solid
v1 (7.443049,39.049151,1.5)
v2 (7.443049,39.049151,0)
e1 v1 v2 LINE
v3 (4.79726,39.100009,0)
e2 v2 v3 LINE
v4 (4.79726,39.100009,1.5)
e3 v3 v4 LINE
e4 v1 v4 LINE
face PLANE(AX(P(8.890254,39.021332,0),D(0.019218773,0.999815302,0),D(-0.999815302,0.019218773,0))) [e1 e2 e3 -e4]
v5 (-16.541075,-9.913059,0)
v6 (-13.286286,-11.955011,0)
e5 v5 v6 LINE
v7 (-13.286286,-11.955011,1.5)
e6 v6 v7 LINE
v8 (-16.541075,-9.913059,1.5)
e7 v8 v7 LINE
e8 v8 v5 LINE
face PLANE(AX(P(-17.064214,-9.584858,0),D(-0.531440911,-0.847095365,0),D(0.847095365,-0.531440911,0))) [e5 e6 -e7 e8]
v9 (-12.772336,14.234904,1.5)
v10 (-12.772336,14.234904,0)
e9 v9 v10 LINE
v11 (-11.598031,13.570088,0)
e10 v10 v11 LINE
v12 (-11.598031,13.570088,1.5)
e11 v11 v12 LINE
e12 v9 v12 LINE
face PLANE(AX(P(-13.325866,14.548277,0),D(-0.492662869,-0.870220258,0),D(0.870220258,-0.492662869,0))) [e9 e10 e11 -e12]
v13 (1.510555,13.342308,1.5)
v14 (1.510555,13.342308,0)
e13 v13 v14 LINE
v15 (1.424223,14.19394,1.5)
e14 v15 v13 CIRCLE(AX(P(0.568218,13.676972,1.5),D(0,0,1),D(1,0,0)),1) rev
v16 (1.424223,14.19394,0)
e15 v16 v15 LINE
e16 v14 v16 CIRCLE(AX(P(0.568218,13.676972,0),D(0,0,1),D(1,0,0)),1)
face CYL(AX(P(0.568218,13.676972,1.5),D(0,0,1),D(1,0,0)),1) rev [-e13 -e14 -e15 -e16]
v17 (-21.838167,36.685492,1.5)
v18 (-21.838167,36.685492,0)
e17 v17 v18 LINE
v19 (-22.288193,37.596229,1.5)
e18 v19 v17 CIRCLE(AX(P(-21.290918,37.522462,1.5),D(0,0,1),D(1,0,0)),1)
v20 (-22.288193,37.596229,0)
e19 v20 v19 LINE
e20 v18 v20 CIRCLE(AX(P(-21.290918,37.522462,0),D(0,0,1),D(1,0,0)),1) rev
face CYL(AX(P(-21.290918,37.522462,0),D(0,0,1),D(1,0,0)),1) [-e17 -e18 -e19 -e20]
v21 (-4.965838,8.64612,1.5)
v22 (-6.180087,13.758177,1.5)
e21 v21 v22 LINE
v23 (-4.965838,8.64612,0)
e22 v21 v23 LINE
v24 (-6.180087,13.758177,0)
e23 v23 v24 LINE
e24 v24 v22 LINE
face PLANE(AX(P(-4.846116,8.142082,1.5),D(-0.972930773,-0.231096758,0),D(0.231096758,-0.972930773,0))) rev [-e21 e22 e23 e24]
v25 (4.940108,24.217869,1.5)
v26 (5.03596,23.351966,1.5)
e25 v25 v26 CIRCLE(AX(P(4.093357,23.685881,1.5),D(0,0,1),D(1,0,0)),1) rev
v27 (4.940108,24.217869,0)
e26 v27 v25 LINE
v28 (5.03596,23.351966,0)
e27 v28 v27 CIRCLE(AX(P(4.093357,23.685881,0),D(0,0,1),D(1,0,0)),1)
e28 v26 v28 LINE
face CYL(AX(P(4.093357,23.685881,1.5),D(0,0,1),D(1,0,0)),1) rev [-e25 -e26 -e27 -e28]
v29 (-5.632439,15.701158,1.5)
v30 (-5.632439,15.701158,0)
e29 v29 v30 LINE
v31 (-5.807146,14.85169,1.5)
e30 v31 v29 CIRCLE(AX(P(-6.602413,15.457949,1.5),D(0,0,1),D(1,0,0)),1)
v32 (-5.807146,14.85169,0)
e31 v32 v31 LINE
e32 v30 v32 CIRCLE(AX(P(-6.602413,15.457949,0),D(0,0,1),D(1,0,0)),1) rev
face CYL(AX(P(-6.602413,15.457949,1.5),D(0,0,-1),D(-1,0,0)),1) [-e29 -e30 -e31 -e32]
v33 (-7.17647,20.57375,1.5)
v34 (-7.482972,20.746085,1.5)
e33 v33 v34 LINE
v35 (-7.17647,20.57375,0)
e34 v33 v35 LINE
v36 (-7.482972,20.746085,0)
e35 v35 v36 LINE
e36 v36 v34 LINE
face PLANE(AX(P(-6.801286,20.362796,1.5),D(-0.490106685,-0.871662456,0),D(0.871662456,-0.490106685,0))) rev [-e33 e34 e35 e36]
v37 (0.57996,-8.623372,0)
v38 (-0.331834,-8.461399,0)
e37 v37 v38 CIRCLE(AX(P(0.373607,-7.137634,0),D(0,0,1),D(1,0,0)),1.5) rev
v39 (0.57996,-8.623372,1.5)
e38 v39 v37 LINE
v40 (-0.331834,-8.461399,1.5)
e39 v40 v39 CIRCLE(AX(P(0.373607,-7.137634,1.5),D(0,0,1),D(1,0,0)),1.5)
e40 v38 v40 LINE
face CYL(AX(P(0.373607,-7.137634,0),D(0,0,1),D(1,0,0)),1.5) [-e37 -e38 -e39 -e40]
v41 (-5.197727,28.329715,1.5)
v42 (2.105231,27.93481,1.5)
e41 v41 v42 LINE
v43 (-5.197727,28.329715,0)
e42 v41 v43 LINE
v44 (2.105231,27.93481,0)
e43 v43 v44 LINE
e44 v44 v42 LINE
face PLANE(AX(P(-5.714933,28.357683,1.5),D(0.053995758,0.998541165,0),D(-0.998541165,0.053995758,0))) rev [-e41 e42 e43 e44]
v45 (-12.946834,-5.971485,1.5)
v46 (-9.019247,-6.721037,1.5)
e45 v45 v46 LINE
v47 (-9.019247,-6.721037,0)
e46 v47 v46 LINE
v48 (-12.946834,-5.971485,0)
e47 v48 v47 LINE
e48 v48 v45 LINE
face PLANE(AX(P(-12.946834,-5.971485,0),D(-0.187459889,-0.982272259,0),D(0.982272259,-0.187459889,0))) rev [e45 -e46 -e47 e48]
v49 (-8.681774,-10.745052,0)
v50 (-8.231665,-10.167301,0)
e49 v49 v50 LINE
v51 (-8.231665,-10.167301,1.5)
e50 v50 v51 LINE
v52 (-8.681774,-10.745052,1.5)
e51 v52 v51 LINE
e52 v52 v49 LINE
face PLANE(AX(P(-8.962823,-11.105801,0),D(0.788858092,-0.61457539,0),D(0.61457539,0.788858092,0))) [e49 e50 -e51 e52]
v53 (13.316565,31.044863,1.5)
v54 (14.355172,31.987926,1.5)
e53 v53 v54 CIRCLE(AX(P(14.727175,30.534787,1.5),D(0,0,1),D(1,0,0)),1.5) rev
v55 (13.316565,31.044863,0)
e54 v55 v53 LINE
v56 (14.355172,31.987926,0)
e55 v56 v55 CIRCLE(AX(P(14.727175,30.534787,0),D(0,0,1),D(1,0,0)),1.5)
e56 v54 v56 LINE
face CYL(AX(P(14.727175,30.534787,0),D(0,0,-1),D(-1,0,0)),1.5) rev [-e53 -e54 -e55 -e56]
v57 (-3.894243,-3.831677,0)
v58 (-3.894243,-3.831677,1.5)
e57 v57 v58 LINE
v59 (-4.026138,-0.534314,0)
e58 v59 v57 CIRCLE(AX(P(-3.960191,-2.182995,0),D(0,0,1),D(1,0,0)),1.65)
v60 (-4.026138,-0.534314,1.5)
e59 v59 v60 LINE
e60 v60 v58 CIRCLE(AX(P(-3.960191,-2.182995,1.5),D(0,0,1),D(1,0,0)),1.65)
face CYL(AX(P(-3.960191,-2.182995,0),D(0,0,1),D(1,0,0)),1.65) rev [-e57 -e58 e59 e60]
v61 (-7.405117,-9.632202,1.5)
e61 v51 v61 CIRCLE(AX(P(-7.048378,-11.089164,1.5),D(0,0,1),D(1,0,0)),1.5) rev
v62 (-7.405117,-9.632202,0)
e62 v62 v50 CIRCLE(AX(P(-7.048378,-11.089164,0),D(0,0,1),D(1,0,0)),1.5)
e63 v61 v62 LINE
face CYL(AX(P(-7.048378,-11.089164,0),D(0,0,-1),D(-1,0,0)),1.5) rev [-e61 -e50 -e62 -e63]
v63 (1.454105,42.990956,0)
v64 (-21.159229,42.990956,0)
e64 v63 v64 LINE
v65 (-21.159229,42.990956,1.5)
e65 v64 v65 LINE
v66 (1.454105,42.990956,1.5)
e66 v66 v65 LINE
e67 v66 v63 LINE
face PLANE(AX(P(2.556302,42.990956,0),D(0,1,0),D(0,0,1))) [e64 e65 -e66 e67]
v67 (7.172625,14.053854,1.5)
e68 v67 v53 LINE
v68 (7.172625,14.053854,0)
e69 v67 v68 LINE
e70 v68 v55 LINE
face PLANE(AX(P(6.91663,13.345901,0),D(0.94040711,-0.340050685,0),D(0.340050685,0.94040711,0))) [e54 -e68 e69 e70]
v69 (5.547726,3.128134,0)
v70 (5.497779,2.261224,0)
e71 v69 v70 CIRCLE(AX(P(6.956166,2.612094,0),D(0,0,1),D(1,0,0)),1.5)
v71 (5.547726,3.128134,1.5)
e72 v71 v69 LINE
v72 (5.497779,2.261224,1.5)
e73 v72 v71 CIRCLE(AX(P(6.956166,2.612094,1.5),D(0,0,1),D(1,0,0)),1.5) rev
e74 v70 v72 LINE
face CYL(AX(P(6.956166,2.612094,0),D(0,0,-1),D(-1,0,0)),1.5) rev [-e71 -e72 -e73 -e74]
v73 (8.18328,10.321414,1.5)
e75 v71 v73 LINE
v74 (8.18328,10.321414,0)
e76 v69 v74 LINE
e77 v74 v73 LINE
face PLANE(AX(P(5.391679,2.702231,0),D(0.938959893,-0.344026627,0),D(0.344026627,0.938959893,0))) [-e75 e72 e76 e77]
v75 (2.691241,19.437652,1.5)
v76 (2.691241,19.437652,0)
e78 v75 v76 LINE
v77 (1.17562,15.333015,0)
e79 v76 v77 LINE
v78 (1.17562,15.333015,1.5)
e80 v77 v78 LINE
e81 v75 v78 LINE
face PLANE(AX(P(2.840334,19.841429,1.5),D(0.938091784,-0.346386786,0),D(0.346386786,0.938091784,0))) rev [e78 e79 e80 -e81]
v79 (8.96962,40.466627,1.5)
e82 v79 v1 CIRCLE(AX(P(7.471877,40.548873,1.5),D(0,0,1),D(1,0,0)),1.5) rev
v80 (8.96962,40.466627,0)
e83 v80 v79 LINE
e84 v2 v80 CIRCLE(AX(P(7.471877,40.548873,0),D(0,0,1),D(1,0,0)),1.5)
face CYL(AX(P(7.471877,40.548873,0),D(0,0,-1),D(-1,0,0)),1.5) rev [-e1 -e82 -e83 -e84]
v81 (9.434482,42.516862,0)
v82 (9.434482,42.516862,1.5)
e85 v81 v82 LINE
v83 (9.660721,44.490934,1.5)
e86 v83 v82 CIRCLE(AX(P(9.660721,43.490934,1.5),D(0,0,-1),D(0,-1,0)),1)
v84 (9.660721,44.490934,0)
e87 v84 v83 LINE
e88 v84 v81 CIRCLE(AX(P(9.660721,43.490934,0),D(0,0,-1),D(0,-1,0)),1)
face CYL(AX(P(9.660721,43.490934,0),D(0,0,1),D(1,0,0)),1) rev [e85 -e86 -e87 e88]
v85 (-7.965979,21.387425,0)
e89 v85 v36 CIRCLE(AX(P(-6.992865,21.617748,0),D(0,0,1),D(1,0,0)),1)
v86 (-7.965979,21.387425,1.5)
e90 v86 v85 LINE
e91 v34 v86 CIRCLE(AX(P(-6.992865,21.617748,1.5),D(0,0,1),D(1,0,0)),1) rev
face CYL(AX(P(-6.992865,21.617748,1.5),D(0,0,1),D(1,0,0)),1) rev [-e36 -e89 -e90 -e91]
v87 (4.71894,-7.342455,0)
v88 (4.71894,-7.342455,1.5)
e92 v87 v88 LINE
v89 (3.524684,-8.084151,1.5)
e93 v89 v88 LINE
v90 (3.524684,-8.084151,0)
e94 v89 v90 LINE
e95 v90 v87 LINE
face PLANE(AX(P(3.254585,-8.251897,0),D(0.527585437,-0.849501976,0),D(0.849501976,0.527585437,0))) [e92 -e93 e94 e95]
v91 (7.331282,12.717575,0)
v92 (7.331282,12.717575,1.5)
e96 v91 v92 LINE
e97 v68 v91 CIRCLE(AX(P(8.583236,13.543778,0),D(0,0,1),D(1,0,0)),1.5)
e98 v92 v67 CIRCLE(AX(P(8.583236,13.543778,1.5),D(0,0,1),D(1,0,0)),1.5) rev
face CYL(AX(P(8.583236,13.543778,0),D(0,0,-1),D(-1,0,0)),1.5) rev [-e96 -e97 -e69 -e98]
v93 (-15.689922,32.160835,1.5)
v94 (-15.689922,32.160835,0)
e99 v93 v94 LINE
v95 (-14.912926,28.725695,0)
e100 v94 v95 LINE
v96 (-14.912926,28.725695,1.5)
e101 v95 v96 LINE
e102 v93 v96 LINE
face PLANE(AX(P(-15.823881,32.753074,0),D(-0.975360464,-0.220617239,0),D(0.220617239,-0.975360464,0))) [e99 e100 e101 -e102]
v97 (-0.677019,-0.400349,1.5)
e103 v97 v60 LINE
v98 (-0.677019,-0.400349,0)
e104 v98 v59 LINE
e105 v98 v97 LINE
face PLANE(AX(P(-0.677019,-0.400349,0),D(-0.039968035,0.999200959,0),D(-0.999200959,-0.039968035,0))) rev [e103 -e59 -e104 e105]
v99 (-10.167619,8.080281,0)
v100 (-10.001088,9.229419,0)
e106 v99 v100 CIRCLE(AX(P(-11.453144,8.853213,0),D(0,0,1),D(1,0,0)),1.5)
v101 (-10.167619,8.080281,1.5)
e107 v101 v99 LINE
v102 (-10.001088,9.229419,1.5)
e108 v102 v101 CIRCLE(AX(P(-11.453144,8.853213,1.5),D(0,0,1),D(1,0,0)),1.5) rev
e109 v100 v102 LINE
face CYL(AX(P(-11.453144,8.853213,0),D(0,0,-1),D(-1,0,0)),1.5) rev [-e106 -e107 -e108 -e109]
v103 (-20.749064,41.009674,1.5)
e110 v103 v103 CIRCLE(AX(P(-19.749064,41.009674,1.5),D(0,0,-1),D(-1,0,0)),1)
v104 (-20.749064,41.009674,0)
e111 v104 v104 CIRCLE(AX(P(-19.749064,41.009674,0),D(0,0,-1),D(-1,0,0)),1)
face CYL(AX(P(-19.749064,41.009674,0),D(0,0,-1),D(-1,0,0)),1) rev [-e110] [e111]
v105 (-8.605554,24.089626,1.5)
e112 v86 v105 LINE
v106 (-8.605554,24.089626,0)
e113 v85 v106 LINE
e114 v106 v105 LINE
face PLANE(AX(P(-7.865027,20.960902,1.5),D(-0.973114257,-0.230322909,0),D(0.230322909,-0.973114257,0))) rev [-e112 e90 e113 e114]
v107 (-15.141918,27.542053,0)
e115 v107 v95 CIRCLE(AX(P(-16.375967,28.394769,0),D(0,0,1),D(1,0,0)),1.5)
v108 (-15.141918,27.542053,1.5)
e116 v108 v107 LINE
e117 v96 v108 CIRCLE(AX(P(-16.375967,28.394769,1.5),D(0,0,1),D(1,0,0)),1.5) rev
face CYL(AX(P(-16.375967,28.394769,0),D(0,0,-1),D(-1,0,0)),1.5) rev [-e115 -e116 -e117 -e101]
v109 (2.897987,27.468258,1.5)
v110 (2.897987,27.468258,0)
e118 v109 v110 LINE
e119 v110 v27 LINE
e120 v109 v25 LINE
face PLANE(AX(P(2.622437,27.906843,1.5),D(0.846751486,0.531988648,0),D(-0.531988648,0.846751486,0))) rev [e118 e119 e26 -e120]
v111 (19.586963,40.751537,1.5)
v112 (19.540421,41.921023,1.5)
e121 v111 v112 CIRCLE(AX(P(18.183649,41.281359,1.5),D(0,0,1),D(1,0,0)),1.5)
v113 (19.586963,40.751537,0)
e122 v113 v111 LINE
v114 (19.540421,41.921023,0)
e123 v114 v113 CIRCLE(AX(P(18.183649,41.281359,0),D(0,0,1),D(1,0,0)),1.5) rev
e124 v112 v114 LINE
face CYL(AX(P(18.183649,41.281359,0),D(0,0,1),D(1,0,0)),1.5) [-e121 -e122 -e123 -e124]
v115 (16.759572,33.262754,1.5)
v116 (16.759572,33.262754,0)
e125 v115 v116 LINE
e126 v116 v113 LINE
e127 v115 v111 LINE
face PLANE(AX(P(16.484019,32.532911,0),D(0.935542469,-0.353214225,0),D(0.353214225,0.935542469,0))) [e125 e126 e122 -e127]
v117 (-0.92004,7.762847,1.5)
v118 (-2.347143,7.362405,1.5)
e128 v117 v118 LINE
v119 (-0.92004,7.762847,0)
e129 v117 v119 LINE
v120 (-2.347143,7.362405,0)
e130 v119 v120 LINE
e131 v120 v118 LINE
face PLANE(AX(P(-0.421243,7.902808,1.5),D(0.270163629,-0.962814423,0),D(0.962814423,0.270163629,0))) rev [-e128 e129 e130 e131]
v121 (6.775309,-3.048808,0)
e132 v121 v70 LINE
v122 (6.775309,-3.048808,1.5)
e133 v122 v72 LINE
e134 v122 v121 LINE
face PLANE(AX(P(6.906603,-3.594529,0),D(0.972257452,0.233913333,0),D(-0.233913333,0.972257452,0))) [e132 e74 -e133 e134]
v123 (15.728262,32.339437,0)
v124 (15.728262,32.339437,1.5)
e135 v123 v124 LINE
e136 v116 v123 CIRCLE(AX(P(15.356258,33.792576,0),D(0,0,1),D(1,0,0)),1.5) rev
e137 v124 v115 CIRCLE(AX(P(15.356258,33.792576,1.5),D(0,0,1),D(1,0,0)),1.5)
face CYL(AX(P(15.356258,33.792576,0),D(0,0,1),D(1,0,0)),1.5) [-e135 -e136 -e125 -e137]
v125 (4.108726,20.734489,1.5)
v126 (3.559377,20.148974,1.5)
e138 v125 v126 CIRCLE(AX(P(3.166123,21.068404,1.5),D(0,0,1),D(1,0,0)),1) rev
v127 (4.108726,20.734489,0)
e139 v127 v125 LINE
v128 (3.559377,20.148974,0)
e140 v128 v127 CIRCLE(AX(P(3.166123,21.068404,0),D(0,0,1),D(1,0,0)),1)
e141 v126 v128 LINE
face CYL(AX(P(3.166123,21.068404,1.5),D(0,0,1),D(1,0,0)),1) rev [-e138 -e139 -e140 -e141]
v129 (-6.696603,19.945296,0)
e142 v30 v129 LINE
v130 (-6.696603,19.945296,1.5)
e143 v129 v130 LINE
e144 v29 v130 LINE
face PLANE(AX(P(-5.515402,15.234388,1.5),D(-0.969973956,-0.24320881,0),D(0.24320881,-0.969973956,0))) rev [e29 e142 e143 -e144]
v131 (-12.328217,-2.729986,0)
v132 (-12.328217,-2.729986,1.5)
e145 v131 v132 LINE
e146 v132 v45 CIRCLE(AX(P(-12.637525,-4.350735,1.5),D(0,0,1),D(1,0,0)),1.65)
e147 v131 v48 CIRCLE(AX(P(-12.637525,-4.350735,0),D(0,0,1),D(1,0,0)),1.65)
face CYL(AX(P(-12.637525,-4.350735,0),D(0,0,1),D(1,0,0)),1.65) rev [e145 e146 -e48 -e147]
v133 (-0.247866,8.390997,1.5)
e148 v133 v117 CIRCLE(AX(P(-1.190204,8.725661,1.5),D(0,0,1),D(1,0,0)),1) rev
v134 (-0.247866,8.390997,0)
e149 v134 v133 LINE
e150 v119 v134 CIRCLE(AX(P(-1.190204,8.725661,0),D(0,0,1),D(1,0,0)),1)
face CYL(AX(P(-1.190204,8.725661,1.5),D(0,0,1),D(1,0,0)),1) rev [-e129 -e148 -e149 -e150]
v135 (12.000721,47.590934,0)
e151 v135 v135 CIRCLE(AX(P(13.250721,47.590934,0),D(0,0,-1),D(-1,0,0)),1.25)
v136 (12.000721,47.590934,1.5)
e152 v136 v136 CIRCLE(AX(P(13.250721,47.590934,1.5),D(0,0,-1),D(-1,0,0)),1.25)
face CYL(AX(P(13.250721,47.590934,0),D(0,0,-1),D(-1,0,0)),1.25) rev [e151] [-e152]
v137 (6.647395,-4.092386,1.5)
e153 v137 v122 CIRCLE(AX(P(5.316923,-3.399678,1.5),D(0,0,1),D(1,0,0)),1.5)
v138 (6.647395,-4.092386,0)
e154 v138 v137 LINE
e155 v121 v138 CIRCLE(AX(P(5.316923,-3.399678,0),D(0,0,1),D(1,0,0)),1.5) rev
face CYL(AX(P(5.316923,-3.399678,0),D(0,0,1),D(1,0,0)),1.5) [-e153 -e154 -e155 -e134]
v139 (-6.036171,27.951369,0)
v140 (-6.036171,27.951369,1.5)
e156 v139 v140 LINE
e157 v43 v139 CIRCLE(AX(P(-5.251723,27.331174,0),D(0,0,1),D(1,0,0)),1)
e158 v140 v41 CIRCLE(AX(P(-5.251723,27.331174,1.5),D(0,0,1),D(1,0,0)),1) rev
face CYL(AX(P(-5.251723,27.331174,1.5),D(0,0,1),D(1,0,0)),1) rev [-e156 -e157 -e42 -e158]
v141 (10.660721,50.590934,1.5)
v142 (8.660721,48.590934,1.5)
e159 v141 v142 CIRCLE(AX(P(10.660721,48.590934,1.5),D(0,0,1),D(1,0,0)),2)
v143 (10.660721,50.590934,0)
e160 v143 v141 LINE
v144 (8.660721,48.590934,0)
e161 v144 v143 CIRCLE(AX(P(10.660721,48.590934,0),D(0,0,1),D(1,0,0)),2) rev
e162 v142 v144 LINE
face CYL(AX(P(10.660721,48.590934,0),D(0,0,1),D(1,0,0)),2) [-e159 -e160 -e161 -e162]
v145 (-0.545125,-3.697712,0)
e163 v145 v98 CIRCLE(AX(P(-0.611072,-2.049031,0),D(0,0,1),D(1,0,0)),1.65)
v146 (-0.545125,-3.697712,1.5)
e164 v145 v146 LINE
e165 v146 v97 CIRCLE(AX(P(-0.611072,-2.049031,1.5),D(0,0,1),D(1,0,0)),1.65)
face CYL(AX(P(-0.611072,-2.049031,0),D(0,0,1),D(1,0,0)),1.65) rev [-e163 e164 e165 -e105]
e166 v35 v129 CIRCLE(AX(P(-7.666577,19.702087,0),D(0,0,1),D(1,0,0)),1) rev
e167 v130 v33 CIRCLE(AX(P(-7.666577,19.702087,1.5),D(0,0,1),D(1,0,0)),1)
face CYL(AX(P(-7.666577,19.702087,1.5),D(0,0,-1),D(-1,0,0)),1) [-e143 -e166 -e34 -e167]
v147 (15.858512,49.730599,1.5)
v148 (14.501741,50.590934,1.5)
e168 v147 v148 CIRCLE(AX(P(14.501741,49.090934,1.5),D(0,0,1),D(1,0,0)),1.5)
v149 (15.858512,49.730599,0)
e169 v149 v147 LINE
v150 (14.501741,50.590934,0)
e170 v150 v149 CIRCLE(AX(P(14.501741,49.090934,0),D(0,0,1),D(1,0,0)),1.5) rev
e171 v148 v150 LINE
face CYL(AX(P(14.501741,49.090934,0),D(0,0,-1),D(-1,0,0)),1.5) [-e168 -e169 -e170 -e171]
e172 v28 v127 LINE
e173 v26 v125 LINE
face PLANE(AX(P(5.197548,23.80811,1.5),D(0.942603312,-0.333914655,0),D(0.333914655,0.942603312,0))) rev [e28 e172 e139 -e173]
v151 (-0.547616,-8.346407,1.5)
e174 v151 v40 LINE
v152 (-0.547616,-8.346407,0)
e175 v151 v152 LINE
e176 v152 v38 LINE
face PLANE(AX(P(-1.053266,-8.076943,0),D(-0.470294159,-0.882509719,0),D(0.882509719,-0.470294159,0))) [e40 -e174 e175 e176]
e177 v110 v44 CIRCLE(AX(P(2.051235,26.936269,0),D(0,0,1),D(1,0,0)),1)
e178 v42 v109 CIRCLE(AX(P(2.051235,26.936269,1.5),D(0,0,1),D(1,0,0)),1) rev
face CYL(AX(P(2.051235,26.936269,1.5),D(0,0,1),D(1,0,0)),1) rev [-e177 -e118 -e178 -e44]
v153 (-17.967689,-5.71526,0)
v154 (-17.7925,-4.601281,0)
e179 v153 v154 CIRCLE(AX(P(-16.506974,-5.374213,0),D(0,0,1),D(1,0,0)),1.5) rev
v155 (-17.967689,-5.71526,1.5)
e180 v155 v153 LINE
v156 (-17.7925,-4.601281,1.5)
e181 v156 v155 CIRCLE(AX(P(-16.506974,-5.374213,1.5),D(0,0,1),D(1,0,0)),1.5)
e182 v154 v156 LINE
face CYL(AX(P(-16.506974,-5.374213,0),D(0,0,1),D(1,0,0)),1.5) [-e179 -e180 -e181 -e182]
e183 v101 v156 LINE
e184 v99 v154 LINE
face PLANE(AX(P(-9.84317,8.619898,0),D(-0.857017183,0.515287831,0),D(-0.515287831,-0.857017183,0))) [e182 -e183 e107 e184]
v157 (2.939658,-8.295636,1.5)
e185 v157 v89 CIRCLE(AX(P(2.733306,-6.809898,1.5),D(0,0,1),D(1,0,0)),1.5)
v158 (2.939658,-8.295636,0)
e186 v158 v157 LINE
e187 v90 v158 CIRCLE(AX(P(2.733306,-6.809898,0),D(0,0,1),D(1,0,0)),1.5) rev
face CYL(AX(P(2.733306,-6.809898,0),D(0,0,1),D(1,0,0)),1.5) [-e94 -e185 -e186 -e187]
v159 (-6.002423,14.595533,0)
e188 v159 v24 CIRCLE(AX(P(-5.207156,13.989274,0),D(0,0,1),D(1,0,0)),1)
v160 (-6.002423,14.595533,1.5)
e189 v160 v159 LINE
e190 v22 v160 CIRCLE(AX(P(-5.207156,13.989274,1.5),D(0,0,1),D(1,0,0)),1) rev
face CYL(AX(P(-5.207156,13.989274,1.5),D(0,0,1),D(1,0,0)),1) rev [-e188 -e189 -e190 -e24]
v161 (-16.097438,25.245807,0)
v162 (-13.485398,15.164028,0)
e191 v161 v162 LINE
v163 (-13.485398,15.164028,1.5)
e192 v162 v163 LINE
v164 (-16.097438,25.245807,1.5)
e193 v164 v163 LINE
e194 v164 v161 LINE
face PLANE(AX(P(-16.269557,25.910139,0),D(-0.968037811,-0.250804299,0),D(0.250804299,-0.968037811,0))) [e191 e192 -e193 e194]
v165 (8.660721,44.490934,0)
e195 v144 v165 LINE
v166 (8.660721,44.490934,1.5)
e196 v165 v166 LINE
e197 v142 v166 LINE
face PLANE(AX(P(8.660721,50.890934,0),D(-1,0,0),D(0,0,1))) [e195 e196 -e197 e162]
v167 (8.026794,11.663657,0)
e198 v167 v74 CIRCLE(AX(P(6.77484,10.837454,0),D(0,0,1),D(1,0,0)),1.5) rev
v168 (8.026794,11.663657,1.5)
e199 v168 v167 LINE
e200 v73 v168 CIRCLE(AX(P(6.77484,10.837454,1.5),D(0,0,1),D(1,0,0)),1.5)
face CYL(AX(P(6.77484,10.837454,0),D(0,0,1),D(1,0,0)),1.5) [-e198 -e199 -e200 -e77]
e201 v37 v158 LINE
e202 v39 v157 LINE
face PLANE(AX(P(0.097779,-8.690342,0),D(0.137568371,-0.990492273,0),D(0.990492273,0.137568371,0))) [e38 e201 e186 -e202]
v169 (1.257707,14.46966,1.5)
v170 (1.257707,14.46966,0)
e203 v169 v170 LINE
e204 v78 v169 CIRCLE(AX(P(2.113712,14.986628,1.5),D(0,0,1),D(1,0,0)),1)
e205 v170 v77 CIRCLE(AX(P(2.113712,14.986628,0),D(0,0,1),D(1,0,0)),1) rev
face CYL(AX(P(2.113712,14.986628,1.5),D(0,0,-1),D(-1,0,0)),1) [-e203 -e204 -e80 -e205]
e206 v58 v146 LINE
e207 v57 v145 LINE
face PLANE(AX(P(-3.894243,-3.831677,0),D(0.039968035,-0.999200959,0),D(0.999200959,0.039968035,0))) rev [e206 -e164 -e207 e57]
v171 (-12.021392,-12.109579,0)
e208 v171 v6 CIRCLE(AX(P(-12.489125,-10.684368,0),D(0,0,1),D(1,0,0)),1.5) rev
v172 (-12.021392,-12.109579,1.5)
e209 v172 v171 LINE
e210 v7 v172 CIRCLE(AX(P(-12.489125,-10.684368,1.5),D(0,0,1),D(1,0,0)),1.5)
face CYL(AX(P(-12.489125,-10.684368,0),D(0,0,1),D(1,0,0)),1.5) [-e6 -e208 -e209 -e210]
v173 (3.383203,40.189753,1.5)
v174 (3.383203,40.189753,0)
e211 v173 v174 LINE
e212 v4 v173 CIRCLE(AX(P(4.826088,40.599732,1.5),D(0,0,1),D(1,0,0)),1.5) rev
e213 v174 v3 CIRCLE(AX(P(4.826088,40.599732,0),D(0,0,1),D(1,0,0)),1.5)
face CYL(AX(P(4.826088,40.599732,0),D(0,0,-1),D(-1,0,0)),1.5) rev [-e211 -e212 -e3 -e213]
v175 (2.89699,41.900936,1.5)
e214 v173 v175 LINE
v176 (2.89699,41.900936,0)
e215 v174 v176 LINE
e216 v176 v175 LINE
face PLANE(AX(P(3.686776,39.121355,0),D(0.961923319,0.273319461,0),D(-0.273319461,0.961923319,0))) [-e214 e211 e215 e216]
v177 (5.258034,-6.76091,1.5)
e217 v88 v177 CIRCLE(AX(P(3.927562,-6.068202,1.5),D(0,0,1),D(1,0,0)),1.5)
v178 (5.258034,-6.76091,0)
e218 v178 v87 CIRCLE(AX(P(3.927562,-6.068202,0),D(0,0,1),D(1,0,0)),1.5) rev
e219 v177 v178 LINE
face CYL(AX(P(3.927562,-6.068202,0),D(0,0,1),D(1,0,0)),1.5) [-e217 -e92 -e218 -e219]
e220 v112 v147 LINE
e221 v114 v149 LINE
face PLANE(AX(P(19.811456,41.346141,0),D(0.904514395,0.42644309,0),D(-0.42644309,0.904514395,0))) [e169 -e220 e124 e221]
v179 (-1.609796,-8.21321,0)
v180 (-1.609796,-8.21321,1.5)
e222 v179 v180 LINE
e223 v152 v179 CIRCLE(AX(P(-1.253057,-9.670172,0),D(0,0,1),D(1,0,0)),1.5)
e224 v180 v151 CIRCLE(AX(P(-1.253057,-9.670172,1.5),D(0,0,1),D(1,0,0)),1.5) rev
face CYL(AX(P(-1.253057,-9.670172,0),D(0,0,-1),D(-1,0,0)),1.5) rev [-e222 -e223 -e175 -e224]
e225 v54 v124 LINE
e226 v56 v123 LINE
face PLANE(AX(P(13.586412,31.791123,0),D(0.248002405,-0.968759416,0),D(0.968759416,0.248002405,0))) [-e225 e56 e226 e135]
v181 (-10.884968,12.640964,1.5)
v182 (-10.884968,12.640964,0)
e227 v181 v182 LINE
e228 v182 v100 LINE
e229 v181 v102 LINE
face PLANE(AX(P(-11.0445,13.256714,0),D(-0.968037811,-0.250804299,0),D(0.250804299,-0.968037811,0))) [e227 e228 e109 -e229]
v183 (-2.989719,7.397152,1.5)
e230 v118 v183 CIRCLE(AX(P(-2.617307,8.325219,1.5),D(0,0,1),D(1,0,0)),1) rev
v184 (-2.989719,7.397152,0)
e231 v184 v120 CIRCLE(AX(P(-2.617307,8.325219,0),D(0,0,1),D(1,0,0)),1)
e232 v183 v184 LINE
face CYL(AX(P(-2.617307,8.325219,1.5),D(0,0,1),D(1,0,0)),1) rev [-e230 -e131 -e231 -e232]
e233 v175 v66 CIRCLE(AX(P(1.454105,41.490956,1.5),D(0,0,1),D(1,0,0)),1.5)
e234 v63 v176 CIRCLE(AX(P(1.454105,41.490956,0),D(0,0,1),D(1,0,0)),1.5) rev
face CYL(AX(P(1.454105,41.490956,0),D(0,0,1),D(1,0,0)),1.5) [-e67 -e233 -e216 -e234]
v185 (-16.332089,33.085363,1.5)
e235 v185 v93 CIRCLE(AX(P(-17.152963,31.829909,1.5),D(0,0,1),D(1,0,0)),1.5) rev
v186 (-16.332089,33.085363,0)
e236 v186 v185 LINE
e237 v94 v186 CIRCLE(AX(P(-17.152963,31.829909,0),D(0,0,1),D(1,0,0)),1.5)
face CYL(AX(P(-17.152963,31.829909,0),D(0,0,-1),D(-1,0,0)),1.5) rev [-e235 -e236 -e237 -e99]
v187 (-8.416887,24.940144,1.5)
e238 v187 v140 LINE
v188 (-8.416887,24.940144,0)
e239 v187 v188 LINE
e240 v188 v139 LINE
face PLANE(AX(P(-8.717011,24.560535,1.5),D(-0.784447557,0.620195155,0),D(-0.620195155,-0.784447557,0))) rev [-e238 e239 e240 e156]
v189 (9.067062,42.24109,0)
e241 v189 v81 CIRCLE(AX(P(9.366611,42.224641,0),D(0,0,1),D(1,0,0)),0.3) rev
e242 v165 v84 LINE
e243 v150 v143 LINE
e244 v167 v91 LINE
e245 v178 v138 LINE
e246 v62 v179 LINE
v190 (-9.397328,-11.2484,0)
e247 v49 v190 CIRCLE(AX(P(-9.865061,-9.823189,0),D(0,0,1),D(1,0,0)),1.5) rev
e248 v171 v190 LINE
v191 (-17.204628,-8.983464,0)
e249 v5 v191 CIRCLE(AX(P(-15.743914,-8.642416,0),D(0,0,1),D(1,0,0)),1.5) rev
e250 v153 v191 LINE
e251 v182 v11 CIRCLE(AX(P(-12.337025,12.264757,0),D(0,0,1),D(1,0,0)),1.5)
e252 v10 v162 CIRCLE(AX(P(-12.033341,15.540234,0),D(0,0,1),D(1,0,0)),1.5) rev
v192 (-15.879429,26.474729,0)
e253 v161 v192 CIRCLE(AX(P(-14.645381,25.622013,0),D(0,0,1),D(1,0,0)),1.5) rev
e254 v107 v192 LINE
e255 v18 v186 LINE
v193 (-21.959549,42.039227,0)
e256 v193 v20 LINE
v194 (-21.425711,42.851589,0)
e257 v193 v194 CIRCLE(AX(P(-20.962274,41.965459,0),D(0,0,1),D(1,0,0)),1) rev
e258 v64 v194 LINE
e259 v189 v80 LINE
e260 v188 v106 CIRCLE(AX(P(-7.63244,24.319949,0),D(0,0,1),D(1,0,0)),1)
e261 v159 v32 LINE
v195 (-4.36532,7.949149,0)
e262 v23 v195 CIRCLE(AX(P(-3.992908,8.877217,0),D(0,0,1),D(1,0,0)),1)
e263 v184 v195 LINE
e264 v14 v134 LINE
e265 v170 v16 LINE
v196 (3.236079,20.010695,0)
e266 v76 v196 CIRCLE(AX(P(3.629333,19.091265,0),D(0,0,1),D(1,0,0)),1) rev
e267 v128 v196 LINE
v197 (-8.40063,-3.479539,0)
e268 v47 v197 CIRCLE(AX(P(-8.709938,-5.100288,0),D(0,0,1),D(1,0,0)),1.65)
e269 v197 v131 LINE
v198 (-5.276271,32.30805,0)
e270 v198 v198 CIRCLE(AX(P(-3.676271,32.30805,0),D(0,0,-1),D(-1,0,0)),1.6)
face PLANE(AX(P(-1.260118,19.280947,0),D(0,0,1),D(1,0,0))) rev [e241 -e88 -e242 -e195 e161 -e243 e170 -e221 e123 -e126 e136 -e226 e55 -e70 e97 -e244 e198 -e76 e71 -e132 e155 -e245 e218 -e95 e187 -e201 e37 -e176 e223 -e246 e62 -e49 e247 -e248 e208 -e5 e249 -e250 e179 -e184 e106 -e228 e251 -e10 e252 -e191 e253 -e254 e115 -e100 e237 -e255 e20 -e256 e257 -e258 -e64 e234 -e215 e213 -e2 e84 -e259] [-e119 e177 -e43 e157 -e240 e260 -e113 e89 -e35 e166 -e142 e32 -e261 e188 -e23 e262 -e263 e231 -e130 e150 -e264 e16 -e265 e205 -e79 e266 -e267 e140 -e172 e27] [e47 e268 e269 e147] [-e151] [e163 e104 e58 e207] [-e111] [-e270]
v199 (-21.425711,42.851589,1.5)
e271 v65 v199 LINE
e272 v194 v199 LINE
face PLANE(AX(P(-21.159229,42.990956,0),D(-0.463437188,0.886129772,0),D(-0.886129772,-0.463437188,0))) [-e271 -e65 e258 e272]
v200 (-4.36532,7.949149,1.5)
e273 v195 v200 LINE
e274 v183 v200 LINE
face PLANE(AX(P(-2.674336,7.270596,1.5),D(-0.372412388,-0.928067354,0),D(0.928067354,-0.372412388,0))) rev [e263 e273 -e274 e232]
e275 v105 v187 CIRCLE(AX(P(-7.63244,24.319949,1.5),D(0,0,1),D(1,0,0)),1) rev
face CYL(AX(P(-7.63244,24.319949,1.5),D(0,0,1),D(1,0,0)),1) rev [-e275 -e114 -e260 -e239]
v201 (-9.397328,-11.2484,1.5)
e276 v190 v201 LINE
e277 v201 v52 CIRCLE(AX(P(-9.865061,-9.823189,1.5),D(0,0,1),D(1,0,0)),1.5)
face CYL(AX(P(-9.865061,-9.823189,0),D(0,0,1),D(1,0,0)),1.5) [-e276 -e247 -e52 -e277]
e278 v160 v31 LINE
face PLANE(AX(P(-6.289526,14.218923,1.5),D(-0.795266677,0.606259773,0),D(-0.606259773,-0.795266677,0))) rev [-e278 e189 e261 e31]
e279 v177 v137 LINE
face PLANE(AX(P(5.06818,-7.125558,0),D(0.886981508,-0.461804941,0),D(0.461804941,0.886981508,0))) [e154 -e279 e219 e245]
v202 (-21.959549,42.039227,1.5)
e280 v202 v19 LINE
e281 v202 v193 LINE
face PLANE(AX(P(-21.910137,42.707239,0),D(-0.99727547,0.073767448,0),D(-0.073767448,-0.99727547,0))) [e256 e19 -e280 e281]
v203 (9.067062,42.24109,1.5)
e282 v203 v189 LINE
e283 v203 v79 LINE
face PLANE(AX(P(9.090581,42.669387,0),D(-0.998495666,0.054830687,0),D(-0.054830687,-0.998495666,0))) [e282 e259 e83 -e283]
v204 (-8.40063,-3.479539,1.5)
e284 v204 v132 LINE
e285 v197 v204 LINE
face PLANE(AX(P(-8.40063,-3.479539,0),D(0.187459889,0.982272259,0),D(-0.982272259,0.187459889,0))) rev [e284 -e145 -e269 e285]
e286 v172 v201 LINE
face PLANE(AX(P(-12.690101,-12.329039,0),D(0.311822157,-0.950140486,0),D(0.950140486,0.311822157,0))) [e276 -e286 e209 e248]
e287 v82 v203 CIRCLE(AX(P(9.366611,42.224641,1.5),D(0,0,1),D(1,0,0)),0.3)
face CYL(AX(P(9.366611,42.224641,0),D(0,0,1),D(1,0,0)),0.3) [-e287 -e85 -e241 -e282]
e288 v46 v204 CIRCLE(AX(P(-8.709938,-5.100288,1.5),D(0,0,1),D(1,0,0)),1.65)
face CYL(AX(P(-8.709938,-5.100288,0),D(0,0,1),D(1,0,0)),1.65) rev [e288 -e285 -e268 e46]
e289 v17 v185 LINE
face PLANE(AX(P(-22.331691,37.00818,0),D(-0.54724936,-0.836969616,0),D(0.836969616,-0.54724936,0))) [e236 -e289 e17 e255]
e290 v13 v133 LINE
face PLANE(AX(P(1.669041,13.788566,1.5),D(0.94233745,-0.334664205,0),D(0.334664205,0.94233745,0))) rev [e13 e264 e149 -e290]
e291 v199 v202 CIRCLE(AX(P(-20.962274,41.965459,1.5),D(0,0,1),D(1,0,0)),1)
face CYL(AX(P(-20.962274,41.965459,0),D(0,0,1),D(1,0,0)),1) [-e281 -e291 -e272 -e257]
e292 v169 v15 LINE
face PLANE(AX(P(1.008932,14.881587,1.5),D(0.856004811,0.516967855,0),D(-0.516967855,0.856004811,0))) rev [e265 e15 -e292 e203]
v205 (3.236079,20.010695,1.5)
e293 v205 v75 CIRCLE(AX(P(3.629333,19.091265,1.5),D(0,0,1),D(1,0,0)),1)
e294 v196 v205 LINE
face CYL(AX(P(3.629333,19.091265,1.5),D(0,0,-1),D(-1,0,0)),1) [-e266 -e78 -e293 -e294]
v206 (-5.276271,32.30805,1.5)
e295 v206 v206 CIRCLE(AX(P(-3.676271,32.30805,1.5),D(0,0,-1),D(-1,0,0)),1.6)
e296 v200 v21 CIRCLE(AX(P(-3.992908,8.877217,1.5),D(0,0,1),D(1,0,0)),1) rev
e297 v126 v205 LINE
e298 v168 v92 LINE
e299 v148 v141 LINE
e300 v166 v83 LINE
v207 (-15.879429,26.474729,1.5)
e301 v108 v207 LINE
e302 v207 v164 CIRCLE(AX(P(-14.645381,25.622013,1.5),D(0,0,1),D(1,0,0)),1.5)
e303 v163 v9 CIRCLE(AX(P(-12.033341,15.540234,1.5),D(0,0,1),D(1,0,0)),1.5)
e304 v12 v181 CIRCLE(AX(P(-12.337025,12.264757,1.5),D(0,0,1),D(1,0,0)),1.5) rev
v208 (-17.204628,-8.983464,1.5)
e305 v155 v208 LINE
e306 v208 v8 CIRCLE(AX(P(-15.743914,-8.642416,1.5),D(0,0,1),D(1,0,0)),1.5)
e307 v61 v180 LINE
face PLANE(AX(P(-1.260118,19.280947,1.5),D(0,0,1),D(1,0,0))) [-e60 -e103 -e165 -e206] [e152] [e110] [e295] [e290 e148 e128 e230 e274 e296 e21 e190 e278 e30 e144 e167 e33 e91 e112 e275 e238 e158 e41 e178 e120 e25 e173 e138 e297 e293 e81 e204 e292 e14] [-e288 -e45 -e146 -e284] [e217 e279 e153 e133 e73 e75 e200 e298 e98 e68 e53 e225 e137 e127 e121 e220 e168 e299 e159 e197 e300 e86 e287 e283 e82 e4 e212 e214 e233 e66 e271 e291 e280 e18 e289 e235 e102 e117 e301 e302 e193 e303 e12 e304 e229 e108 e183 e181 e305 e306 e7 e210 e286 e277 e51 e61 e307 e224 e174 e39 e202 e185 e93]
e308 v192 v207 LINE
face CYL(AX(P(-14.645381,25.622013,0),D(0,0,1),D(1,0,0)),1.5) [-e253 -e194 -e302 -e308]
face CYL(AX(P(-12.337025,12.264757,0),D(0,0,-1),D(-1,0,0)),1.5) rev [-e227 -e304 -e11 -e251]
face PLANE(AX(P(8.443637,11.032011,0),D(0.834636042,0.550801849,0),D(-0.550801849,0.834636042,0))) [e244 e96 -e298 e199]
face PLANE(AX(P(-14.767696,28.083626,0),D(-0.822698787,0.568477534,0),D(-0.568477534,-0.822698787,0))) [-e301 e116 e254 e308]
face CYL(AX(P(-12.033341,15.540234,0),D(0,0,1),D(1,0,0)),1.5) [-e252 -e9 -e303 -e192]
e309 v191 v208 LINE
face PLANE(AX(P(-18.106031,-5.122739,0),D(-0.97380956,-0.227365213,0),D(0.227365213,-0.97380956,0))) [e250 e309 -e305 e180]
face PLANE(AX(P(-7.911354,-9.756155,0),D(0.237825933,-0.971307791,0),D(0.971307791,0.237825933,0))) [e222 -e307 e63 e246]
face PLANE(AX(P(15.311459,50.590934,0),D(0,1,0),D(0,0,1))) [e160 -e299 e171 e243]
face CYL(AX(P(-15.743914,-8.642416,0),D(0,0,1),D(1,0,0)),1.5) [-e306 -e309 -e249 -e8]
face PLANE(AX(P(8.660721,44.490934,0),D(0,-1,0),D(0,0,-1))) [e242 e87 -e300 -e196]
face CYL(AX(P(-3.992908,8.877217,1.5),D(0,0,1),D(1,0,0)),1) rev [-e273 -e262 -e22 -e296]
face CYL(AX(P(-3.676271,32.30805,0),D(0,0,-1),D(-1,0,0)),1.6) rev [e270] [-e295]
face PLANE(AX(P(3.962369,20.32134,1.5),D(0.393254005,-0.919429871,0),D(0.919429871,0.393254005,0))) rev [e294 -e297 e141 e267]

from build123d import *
from OCP.BRepFilletAPI import BRepFilletAPI_MakeFillet

# Parameters (mm, degrees)
CUT_EXTRUDE1_START         = -1.5
CUT_EXTRUDE1_DEPTH         = 1.5
CUT_EXTRUDE2_DEPTH         = 56.320855182
CUT_EXTRUDE3_DEPTH         = 56.320855182
FILLET1_R1                 = 2
FILLET1_R2                 = 1.5
FILLET1_R3                 = 1.5
FILLET1_R4                 = 1.5
FILLET1_R5                 = 1
FILLET1_R6                 = 1
FILLET1_R7                 = 0.3
F_2_0_2_DIAMETER_HOLE1_D   = 2
F_2_5_2_5_DIAMETER_HOLE1_D = 2.5
F_3_2_3_2_DIAMETER_HOLE1_D = 3.2


with BuildPart() as part:
    # Cut-Extrude1: read off the stored shape, not the designer's step
    # Cut-Extrude1 outline → Cut-Extrude1 (new body)
    with BuildSketch(Plane.XY.offset(1.5).offset(CUT_EXTRUDE1_START)):
        with BuildLine():
            Line((-21.15922941, 42.990956489), (-21.918524362, 42.593852668))
            Line((-21.918524362, 42.593852668), (-22.331690837, 37.008180338))
            Line((-22.331690837, 37.008180338), (-15.823880633, 32.753073704))
            Line((-15.823880633, 32.753073704), (-14.767696121, 28.083626208))
            Line((-14.767696121, 28.083626208), (-16.26955663, 25.9101387))
            Line((-16.26955663, 25.9101387), (-13.325866142, 14.548277254))
            Line((-13.325866142, 14.548277254), (-11.044500218, 13.256714261))
            Line((-11.044500218, 13.256714261), (-9.843169723, 8.619898436))
            Line((-9.843169723, 8.619898436), (-18.106030722, -5.122739041))
            Line((-18.106030722, -5.122739041), (-17.064214449, -9.58485809))
            Line((-17.064214449, -9.58485809), (-12.690100502, -12.329039203))
            Line((-12.690100502, -12.329039203), (-8.962822896, -11.10580142))
            Line((-8.962822896, -11.10580142), (-7.911354227, -9.756154848))
            Line((-7.911354227, -9.756154848), (-1.053266461, -8.076943446))
            Line((-1.053266461, -8.076943446), (0.097779189, -8.690341842))
            Line((0.097779189, -8.690341842), (3.254584825, -8.251896615))
            Line((3.254584825, -8.251896615), (5.068180176, -7.125558451))
            Line((5.068180176, -7.125558451), (6.906602667, -3.594529202))
            Line((6.906602667, -3.594529202), (5.391678643, 2.702231034))
            Line((5.391678643, 2.702231034), (8.443636754, 11.032011447))
            Line((8.443636754, 11.032011447), (6.916630149, 13.34590119))
            Line((6.916630149, 13.34590119), (13.586412116, 31.791123225))
            Line((13.586412116, 31.791123225), (16.484018961, 32.532910561))
            Line((16.484018961, 32.532910561), (19.81145552, 41.346140579))
            Line((19.81145552, 41.346140579), (15.452897729, 50.590933994))
            Line((15.452897729, 50.590933994), (8.66072149, 50.590933994))
            Line((8.66072149, 50.590933994), (8.66072149, 44.490933994))
            Line((8.66072149, 44.490933994), (9.66072149, 44.490933994))
            ThreePointArc((9.66072149, 44.490933994), (10.615066101, 43.192226171), (9.090581088, 42.66938672))
            Line((9.090581088, 42.66938672), (8.890254379, 39.021331889))
            Line((8.890254379, 39.021331889), (3.686776041, 39.121354833))
            Line((3.686776041, 39.121354833), (2.58727318, 42.990956489))
            Line((2.58727318, 42.990956489), (-21.15922941, 42.990956489))
        make_face()
        with BuildLine():
            ThreePointArc((-3.894243345, -3.831676855), (-5.608872185, -2.248942531), (-4.026137862, -0.534313691))
            Line((-4.026137862, -0.534313691), (-0.677019452, -0.400348965))
            ThreePointArc((-0.677019452, -0.400348965), (1.037609388, -1.983083289), (-0.545124935, -3.697712129))
            Line((-0.545124935, -3.697712129), (-3.894243345, -3.831676855))
        make_face(mode=Mode.SUBTRACT)
    extrude(amount=CUT_EXTRUDE1_DEPTH)

    # Sketch2 → Cut-Extrude2 (cut, through all)
    with BuildSketch(Plane.XY.offset(1.5)):
        with BuildLine():
            Line((-8.400629557, -3.479539033), (-12.328216542, -2.729986131))
            ThreePointArc((-12.328216542, -2.729986131), (-14.258274586, -4.041426541), (-12.946834177, -5.971484585))
            Line((-12.946834177, -5.971484585), (-9.019247192, -6.721037486))
            ThreePointArc((-9.019247192, -6.721037486), (-7.089189148, -5.409597077), (-8.400629557, -3.479539033))
        make_face()
    extrude(amount=-CUT_EXTRUDE2_DEPTH, mode=Mode.SUBTRACT)

    # Sketch3 → Cut-Extrude3 (cut, through all)
    with BuildSketch(Plane(origin=(0, 0, 0), x_dir=(-1, 0, 0), z_dir=(0, 0, -1))):
        Polygon((-1.669040668, 13.788566276), (0.421242883, 7.902808428), (2.674335505, 7.270595549), (4.846116127, 8.142081874), (6.289526399, 14.218922957), (5.51540188, 15.234387716), (6.801285994, 20.3627961), (7.865027392, 20.96090236), (8.717011471, 24.560534964), (5.714933344, 28.35768306), (-2.622436807, 27.906842737), (-5.197547994, 23.808110114), (-3.962369217, 20.321340098), (-2.840334409, 19.841428909), (-1.008931735, 14.881586698), align=None)
    extrude(amount=-CUT_EXTRUDE3_DEPTH, mode=Mode.SUBTRACT)

    # Fillet1: one fillet with a radius per group of edges: ONE call of the kernel's fillet builder (fillet() takes one radius for all edges)
    fillet1_edges_1 = [part.edges().sort_by_distance(p)[0] for p in [
        (8.66072149, 50.590933994, 0.75),
    ]]
    fillet1_edges_2 = [part.edges().sort_by_distance(p)[0] for p in [
        (-13.325866142, 14.548277254, 0.75),
        (2.58727318, 42.990956489, 0.75),
        (8.890254379, 39.021331889, 0.75),
        (-8.962822896, -11.10580142, 0.75),
        (-17.064214449, -9.58485809, 0.75),
        (-9.843169723, 8.619898436, 0.75),
        (-15.823880633, 32.753073704, 0.75),
        (13.586412116, 31.791123225, 0.75),
        (-12.690100502, -12.329039203, 0.75),
        (8.443636754, 11.032011447, 0.75),
        (-18.106030722, -5.122739041, 0.75),
        (5.391678643, 2.702231034, 0.75),
        (-11.044500218, 13.256714261, 0.75),
        (6.906602667, -3.594529202, 0.75),
        (-16.26955663, 25.9101387, 0.75),
        (3.686776041, 39.121354833, 0.75),
        (3.254584825, -8.251896615, 0.75),
        (16.484018961, 32.532910561, 0.75),
        (0.097779189, -8.690341842, 0.75),
        (-7.911354227, -9.756154848, 0.75),
        (-14.767696121, 28.083626208, 0.75),
    ]]
    fillet1_edges_3 = [part.edges().sort_by_distance(p)[0] for p in [
        (15.452897729, 50.590933994, 0.75),
        (19.81145552, 41.346140579, 0.75),
    ]]
    fillet1_edges_4 = [part.edges().sort_by_distance(p)[0] for p in [
        (-1.053266461, -8.076943446, 0.75),
        (6.916630149, 13.34590119, 0.75),
        (5.068180176, -7.125558451, 0.75),
    ]]
    fillet1_edges_5 = [part.edges().sort_by_distance(p)[0] for p in [
        (-6.801285994, 20.3627961, 0.75),
        (5.197547994, 23.808110114, 0.75),
    ]]
    fillet1_edges_6 = [part.edges().sort_by_distance(p)[0] for p in [
        (1.008931735, 14.881586698, 0.75),
        (1.669040668, 13.788566276, 0.75),
        (-21.918524362, 42.593852668, 0.75),
        (2.840334409, 19.841428909, 0.75),
        (-22.331690837, 37.008180338, 0.75),
        (-0.421242883, 7.902808428, 0.75),
        (-6.289526399, 14.218922957, 0.75),
        (-2.674335505, 7.270595549, 0.75),
        (-5.51540188, 15.234387716, 0.75),
        (-4.846116127, 8.142081874, 0.75),
        (3.962369217, 20.321340098, 0.75),
        (2.622436807, 27.906842737, 0.75),
        (-7.865027392, 20.96090236, 0.75),
        (-5.714933344, 28.35768306, 0.75),
        (-8.717011471, 24.560534964, 0.75),
    ]]
    fillet1_edges_7 = [part.edges().sort_by_distance(p)[0] for p in [
        (9.090581088, 42.66938672, 0.75),
    ]]
    fillet1 = BRepFilletAPI_MakeFillet(part.part.solid().wrapped)
    for e in fillet1_edges_1:
        fillet1.Add(FILLET1_R1, e.wrapped)
    for e in fillet1_edges_2:
        fillet1.Add(FILLET1_R2, e.wrapped)
    for e in fillet1_edges_3:
        fillet1.Add(FILLET1_R3, e.wrapped)
    for e in fillet1_edges_4:
        fillet1.Add(FILLET1_R4, e.wrapped)
    for e in fillet1_edges_5:
        fillet1.Add(FILLET1_R5, e.wrapped)
    for e in fillet1_edges_6:
        fillet1.Add(FILLET1_R6, e.wrapped)
    for e in fillet1_edges_7:
        fillet1.Add(FILLET1_R7, e.wrapped)
    add(Compound.cast(fillet1.Shape()), mode=Mode.REPLACE)

    # Ø2.0 (2) Diameter Hole1 (through all)
    with Locations(Plane(origin=(0, 0, 0), x_dir=(-1, 0, 0), z_dir=(0, 0, -1))):
        with Locations((19.749063689, 41.009673781)):
            Hole(F_2_0_2_DIAMETER_HOLE1_D / 2)

    # Ø2.5 (2.5) Diameter Hole1 (through all)
    with Locations(Plane(origin=(0, 0, 0), x_dir=(-1, 0, 0), z_dir=(0, 0, -1))):
        with Locations((-13.25072149, 47.590933994)):
            Hole(F_2_5_2_5_DIAMETER_HOLE1_D / 2)

    # Ø3.2 (3.2) Diameter Hole1 (through all)
    with Locations(Plane(origin=(0, 0, 0), x_dir=(-1, 0, 0), z_dir=(0, 0, -1))):
        with Locations((3.676270681, 32.308049922)):
            Hole(F_3_2_3_2_DIAMETER_HOLE1_D / 2)


solid = part.part
